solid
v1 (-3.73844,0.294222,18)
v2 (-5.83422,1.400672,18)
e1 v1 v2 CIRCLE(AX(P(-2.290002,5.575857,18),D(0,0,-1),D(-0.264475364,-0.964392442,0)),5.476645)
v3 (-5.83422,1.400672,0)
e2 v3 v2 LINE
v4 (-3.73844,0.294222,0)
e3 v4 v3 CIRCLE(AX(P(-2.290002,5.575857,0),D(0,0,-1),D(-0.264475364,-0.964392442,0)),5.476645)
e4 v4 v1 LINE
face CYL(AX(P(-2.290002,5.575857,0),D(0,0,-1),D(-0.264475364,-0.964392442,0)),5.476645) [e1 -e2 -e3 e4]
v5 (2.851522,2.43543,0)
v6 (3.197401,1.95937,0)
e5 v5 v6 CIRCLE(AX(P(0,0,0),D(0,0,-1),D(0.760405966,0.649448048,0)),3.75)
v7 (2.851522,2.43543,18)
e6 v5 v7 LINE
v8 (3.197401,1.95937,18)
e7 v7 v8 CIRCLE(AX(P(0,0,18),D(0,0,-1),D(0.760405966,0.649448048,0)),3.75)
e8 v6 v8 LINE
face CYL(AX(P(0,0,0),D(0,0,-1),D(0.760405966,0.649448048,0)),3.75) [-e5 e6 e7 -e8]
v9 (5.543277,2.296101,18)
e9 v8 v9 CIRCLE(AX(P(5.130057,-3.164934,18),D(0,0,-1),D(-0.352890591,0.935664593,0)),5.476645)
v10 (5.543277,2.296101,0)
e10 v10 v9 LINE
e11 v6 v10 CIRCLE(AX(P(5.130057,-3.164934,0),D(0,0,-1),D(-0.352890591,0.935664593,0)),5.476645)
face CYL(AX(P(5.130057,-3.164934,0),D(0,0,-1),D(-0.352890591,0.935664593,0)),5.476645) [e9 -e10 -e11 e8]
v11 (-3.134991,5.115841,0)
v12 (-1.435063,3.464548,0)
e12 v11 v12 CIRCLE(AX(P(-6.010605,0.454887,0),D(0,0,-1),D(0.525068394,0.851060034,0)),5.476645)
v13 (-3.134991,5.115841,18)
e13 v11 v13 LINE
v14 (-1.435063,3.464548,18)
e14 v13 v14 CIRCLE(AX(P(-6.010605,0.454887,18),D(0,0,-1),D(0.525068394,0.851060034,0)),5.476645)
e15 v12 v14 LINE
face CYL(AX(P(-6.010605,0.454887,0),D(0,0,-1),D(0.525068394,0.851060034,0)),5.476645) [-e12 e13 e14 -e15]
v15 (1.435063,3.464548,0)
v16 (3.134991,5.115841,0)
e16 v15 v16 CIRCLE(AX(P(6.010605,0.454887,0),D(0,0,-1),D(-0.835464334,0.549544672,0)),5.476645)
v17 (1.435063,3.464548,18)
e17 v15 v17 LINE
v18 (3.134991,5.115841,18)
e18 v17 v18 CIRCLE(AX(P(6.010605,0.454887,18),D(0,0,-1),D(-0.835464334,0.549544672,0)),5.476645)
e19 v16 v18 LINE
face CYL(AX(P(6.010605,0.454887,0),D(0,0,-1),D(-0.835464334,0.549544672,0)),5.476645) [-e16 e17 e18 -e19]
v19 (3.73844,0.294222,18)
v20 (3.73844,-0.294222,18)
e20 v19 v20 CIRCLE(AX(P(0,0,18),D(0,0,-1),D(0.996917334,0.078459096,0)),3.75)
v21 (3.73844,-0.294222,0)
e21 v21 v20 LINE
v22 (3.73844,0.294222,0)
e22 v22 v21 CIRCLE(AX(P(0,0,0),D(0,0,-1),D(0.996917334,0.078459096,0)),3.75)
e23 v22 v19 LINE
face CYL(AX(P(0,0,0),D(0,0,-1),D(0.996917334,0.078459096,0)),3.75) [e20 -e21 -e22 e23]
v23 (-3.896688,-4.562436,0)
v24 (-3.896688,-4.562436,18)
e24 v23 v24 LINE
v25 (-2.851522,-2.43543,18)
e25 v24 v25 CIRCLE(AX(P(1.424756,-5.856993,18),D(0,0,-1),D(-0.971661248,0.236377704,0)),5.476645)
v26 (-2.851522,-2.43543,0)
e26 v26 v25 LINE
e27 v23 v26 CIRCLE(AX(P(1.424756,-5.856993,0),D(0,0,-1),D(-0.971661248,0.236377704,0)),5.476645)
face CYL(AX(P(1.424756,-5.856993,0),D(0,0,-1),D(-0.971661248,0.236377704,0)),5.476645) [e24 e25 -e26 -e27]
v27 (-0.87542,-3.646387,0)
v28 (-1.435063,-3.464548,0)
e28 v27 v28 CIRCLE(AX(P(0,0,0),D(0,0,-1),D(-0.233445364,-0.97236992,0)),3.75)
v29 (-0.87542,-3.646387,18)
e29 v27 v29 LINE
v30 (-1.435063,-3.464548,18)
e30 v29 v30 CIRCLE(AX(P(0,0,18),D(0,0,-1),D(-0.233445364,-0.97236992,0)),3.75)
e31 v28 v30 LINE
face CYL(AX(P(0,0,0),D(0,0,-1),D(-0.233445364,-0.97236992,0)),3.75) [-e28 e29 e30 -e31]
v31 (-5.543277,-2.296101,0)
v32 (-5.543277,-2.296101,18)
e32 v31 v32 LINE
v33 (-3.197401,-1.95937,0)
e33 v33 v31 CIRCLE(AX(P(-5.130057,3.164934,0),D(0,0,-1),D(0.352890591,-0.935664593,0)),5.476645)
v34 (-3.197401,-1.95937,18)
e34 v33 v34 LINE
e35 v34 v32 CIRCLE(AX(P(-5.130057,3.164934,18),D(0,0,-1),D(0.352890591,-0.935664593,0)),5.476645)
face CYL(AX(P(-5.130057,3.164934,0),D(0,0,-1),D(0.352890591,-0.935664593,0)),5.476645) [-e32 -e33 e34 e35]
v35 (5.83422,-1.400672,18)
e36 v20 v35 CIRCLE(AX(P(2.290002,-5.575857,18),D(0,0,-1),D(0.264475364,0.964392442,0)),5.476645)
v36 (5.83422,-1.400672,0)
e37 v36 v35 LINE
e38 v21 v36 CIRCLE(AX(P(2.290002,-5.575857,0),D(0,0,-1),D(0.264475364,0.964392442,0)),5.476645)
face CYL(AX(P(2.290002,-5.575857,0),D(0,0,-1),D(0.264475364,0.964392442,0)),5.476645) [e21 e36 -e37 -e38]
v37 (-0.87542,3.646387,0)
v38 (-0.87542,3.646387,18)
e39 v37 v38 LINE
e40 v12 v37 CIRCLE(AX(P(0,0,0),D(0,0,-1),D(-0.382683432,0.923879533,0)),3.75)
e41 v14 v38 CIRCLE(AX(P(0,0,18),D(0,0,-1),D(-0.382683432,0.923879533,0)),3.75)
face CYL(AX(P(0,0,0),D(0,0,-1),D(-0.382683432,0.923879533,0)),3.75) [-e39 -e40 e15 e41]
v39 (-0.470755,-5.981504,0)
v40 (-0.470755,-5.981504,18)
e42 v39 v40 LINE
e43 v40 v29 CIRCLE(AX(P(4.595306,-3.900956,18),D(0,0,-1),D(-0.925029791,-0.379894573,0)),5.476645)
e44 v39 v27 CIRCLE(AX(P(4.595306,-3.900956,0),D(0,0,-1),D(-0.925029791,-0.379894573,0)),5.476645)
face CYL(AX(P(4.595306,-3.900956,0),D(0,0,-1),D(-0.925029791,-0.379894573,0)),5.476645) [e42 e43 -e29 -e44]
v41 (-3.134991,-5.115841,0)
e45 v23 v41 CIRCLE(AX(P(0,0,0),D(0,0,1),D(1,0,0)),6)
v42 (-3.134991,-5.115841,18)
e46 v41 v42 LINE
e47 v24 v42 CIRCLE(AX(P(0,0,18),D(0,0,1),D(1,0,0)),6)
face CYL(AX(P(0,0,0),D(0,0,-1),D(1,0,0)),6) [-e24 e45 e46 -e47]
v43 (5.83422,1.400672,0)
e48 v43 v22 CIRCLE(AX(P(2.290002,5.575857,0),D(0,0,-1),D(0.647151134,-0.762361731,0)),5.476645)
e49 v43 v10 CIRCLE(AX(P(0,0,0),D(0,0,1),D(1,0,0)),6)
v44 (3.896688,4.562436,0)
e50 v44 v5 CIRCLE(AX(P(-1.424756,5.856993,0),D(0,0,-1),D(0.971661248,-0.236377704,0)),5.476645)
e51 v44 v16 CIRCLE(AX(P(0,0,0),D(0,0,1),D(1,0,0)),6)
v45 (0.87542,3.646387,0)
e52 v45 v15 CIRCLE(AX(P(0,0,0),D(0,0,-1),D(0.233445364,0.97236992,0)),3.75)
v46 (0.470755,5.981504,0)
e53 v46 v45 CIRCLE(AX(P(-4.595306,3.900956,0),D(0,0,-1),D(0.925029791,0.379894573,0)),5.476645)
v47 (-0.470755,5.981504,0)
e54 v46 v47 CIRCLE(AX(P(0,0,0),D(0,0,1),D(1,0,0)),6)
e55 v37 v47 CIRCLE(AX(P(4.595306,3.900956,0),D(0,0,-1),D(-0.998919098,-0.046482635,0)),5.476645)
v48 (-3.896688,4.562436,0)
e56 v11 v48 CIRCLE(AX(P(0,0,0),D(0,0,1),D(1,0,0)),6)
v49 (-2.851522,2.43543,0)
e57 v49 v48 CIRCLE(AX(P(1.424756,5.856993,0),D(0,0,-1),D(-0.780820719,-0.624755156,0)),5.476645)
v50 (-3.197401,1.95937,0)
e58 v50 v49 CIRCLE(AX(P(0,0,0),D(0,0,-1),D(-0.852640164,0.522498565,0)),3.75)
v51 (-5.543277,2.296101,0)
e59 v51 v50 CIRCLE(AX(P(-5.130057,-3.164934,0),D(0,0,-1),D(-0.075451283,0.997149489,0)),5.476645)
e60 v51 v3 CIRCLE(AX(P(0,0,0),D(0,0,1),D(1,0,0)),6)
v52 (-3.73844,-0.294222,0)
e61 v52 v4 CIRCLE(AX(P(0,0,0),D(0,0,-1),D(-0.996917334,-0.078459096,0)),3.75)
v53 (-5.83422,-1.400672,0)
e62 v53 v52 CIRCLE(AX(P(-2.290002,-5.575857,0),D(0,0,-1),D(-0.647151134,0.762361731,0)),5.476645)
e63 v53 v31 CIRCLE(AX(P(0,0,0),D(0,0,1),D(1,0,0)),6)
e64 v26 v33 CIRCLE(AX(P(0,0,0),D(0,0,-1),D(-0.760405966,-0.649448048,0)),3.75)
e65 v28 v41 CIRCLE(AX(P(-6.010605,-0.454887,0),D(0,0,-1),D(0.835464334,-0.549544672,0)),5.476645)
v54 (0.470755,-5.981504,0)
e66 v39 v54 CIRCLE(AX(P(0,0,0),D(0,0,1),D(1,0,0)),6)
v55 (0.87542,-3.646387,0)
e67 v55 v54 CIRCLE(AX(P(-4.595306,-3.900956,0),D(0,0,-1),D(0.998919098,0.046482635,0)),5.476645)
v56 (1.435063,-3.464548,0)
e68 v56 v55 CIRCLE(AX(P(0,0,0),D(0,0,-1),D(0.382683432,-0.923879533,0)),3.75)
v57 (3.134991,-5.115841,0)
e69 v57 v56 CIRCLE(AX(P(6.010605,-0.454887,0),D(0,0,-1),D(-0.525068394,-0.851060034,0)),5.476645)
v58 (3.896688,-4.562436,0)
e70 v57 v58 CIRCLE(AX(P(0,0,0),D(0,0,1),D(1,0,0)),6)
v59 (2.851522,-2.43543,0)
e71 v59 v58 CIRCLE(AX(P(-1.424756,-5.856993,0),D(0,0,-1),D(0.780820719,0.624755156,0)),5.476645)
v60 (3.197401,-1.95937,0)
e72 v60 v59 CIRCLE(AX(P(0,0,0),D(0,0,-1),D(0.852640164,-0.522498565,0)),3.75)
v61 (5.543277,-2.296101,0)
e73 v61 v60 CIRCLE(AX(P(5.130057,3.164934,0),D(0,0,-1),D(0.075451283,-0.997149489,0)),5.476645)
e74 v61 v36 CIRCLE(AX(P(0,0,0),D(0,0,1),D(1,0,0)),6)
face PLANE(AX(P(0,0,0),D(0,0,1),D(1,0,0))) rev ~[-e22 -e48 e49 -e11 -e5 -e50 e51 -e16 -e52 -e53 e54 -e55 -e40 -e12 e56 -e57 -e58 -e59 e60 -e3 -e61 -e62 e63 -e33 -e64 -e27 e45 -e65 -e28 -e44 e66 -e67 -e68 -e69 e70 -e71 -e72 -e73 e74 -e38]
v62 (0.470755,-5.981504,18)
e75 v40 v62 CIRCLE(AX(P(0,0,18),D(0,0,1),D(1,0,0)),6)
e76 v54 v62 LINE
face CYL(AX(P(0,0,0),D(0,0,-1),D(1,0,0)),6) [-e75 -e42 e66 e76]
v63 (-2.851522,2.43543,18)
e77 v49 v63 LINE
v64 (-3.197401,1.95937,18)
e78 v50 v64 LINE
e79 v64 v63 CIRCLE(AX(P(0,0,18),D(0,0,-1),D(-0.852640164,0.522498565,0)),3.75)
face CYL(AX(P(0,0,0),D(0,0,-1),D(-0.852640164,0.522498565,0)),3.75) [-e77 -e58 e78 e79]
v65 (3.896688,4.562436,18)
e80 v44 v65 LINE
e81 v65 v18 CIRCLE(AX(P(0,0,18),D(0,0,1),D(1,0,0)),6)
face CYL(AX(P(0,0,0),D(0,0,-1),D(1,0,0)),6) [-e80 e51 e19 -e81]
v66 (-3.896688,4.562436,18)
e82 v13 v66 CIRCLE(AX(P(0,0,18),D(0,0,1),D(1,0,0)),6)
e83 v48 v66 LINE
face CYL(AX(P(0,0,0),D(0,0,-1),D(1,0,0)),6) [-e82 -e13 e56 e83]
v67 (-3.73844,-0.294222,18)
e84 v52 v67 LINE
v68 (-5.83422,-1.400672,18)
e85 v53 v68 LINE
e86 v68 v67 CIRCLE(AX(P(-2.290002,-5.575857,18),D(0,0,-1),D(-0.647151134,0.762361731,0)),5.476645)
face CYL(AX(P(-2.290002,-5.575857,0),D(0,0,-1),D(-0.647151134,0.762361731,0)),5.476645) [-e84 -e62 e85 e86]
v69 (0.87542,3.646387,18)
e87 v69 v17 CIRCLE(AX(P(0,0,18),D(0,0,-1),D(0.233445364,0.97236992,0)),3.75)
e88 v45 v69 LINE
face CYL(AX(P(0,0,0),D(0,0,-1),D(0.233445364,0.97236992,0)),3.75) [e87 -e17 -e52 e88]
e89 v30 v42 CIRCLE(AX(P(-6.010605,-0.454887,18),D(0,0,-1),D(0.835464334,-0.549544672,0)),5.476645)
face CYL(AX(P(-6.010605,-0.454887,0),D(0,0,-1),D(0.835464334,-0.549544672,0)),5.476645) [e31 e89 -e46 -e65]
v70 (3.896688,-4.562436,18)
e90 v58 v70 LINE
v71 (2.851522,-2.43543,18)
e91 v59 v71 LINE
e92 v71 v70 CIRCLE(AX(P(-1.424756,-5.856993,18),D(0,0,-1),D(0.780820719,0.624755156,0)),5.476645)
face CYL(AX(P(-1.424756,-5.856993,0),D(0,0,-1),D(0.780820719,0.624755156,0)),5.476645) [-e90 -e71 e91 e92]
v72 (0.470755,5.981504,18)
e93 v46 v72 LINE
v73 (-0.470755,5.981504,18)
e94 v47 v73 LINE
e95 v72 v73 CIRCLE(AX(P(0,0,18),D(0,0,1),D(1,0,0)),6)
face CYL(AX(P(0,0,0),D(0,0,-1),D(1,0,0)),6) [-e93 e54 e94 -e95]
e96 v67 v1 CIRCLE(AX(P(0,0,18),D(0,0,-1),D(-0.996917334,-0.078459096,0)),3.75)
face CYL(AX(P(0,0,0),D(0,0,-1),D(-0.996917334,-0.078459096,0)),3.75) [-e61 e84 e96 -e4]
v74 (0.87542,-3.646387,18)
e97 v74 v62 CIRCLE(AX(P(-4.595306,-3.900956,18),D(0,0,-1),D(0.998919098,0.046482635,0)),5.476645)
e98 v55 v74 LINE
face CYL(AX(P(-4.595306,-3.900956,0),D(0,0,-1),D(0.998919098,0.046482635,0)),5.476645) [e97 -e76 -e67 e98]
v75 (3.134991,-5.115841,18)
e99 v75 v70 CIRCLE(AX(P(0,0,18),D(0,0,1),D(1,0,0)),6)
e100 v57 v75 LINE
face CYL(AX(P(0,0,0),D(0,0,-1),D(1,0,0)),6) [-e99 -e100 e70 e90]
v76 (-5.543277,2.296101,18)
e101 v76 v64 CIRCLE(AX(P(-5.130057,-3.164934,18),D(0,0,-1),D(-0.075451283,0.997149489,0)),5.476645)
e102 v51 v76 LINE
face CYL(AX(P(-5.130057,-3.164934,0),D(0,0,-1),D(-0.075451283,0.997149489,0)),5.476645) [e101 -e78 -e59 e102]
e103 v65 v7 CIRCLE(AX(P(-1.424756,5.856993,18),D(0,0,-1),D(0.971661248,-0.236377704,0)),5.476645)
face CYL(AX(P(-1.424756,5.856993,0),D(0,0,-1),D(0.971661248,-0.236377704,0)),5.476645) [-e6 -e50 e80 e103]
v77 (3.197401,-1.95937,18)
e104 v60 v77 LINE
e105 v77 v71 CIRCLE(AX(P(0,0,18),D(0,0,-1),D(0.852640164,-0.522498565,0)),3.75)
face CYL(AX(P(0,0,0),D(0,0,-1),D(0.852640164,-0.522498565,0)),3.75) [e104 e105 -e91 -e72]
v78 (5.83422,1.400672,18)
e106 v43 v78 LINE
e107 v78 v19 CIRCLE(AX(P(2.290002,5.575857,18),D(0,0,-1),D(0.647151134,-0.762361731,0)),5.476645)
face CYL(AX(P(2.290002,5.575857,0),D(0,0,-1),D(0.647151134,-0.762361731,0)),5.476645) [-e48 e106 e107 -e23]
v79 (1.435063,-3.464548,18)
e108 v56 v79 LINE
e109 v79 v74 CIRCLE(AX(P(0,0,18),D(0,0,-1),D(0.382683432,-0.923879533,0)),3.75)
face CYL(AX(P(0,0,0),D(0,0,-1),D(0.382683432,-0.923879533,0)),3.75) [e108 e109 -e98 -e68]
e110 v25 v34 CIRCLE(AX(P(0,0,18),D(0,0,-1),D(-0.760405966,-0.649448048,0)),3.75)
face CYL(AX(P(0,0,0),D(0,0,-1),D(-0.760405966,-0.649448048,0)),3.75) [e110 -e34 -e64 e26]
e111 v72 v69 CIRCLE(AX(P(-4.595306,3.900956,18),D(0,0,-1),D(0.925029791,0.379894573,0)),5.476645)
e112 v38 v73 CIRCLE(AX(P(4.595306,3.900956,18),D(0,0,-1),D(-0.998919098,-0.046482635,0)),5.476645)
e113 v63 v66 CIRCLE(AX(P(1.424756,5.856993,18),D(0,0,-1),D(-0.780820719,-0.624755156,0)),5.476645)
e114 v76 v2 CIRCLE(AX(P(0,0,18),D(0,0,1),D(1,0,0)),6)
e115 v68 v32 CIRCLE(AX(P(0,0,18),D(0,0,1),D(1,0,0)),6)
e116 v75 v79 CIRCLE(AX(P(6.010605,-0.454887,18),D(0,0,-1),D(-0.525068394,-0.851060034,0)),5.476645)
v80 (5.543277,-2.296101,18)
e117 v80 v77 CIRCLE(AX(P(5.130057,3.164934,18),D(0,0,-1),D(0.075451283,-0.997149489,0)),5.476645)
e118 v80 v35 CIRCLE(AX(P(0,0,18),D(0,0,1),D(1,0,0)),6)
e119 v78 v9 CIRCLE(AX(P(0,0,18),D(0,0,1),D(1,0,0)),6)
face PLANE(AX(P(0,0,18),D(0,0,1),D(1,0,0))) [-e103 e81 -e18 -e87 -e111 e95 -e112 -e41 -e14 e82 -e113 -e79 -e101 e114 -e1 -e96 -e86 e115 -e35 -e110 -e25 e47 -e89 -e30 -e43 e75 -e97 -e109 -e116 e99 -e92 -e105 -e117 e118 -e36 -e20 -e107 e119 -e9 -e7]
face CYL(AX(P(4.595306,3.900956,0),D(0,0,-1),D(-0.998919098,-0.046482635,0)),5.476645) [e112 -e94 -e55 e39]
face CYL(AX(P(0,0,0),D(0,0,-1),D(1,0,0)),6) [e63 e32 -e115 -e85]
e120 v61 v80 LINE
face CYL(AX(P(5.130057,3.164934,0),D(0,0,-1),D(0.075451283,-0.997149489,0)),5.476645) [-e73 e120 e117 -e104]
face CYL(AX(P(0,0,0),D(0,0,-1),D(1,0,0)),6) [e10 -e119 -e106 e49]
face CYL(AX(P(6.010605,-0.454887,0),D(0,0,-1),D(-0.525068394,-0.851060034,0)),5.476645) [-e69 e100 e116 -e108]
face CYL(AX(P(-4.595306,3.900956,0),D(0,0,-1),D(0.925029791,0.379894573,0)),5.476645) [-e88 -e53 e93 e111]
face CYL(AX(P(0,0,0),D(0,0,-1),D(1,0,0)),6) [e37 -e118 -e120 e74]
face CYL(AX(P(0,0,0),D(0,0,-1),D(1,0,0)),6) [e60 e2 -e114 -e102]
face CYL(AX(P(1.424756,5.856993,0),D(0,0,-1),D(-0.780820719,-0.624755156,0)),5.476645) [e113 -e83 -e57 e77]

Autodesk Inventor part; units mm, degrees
sketch "Sketch1" plane through (0, 0, 0) normal (0, 0, 1) x (1, 0, 0)
  circle A0 centre (0, 0) radius 6
  dimension "d0" = 12
extrude "Extrusion1" add sketch "Sketch1" along normal blind 18
ref_plane "Work Plane2" through (0, 0, 9) normal (0, 0, 1) x (1, 0, 0)
sketch "Sketch2" plane through (0, 0, 0) normal (0, 0, -1) x (-1, 0, 0)
  circle A0 centre (0, 0) radius 6 projected
  circle A1 centre (0, 0) radius 5
  dimension "d3" = 10
surface extrude "Pitch Diameter" sketch "Sketch2" against normal through all shown yes curves A1
ref_plane "Work Plane8" through (0, 0, 0) normal (0.9510565, 0.309017, 0) x (0, 0, 1)
ref_plane "Work Plane9" through (0, 0, 0) normal (1, 0, 0) x (0, 1, 0)
spur gear teeth "Spur Gear" teeth 10 pitch diameter 10 tip diameter 12 root diameter 7.5 face width 18 start plane through (0, 0, 0) normal (0, 0, -1) x (-1, 0, 0)
equation "\"d0\" = da_da"
equation "\"d1\" = da_b"
equation "\"d3\" = da_d"
equation "\"d16\" = da_aw"
equation "\"d43\" = da_aw"
equation "\"d46\" = da_aw"
equation "\"da_da\" = 12"
equation "\"da_b\" = 18"
equation "\"da_d\" = 10"
equation "\"da_aw\" = 55"
properties part number "rs390_gear" material "Steel"
